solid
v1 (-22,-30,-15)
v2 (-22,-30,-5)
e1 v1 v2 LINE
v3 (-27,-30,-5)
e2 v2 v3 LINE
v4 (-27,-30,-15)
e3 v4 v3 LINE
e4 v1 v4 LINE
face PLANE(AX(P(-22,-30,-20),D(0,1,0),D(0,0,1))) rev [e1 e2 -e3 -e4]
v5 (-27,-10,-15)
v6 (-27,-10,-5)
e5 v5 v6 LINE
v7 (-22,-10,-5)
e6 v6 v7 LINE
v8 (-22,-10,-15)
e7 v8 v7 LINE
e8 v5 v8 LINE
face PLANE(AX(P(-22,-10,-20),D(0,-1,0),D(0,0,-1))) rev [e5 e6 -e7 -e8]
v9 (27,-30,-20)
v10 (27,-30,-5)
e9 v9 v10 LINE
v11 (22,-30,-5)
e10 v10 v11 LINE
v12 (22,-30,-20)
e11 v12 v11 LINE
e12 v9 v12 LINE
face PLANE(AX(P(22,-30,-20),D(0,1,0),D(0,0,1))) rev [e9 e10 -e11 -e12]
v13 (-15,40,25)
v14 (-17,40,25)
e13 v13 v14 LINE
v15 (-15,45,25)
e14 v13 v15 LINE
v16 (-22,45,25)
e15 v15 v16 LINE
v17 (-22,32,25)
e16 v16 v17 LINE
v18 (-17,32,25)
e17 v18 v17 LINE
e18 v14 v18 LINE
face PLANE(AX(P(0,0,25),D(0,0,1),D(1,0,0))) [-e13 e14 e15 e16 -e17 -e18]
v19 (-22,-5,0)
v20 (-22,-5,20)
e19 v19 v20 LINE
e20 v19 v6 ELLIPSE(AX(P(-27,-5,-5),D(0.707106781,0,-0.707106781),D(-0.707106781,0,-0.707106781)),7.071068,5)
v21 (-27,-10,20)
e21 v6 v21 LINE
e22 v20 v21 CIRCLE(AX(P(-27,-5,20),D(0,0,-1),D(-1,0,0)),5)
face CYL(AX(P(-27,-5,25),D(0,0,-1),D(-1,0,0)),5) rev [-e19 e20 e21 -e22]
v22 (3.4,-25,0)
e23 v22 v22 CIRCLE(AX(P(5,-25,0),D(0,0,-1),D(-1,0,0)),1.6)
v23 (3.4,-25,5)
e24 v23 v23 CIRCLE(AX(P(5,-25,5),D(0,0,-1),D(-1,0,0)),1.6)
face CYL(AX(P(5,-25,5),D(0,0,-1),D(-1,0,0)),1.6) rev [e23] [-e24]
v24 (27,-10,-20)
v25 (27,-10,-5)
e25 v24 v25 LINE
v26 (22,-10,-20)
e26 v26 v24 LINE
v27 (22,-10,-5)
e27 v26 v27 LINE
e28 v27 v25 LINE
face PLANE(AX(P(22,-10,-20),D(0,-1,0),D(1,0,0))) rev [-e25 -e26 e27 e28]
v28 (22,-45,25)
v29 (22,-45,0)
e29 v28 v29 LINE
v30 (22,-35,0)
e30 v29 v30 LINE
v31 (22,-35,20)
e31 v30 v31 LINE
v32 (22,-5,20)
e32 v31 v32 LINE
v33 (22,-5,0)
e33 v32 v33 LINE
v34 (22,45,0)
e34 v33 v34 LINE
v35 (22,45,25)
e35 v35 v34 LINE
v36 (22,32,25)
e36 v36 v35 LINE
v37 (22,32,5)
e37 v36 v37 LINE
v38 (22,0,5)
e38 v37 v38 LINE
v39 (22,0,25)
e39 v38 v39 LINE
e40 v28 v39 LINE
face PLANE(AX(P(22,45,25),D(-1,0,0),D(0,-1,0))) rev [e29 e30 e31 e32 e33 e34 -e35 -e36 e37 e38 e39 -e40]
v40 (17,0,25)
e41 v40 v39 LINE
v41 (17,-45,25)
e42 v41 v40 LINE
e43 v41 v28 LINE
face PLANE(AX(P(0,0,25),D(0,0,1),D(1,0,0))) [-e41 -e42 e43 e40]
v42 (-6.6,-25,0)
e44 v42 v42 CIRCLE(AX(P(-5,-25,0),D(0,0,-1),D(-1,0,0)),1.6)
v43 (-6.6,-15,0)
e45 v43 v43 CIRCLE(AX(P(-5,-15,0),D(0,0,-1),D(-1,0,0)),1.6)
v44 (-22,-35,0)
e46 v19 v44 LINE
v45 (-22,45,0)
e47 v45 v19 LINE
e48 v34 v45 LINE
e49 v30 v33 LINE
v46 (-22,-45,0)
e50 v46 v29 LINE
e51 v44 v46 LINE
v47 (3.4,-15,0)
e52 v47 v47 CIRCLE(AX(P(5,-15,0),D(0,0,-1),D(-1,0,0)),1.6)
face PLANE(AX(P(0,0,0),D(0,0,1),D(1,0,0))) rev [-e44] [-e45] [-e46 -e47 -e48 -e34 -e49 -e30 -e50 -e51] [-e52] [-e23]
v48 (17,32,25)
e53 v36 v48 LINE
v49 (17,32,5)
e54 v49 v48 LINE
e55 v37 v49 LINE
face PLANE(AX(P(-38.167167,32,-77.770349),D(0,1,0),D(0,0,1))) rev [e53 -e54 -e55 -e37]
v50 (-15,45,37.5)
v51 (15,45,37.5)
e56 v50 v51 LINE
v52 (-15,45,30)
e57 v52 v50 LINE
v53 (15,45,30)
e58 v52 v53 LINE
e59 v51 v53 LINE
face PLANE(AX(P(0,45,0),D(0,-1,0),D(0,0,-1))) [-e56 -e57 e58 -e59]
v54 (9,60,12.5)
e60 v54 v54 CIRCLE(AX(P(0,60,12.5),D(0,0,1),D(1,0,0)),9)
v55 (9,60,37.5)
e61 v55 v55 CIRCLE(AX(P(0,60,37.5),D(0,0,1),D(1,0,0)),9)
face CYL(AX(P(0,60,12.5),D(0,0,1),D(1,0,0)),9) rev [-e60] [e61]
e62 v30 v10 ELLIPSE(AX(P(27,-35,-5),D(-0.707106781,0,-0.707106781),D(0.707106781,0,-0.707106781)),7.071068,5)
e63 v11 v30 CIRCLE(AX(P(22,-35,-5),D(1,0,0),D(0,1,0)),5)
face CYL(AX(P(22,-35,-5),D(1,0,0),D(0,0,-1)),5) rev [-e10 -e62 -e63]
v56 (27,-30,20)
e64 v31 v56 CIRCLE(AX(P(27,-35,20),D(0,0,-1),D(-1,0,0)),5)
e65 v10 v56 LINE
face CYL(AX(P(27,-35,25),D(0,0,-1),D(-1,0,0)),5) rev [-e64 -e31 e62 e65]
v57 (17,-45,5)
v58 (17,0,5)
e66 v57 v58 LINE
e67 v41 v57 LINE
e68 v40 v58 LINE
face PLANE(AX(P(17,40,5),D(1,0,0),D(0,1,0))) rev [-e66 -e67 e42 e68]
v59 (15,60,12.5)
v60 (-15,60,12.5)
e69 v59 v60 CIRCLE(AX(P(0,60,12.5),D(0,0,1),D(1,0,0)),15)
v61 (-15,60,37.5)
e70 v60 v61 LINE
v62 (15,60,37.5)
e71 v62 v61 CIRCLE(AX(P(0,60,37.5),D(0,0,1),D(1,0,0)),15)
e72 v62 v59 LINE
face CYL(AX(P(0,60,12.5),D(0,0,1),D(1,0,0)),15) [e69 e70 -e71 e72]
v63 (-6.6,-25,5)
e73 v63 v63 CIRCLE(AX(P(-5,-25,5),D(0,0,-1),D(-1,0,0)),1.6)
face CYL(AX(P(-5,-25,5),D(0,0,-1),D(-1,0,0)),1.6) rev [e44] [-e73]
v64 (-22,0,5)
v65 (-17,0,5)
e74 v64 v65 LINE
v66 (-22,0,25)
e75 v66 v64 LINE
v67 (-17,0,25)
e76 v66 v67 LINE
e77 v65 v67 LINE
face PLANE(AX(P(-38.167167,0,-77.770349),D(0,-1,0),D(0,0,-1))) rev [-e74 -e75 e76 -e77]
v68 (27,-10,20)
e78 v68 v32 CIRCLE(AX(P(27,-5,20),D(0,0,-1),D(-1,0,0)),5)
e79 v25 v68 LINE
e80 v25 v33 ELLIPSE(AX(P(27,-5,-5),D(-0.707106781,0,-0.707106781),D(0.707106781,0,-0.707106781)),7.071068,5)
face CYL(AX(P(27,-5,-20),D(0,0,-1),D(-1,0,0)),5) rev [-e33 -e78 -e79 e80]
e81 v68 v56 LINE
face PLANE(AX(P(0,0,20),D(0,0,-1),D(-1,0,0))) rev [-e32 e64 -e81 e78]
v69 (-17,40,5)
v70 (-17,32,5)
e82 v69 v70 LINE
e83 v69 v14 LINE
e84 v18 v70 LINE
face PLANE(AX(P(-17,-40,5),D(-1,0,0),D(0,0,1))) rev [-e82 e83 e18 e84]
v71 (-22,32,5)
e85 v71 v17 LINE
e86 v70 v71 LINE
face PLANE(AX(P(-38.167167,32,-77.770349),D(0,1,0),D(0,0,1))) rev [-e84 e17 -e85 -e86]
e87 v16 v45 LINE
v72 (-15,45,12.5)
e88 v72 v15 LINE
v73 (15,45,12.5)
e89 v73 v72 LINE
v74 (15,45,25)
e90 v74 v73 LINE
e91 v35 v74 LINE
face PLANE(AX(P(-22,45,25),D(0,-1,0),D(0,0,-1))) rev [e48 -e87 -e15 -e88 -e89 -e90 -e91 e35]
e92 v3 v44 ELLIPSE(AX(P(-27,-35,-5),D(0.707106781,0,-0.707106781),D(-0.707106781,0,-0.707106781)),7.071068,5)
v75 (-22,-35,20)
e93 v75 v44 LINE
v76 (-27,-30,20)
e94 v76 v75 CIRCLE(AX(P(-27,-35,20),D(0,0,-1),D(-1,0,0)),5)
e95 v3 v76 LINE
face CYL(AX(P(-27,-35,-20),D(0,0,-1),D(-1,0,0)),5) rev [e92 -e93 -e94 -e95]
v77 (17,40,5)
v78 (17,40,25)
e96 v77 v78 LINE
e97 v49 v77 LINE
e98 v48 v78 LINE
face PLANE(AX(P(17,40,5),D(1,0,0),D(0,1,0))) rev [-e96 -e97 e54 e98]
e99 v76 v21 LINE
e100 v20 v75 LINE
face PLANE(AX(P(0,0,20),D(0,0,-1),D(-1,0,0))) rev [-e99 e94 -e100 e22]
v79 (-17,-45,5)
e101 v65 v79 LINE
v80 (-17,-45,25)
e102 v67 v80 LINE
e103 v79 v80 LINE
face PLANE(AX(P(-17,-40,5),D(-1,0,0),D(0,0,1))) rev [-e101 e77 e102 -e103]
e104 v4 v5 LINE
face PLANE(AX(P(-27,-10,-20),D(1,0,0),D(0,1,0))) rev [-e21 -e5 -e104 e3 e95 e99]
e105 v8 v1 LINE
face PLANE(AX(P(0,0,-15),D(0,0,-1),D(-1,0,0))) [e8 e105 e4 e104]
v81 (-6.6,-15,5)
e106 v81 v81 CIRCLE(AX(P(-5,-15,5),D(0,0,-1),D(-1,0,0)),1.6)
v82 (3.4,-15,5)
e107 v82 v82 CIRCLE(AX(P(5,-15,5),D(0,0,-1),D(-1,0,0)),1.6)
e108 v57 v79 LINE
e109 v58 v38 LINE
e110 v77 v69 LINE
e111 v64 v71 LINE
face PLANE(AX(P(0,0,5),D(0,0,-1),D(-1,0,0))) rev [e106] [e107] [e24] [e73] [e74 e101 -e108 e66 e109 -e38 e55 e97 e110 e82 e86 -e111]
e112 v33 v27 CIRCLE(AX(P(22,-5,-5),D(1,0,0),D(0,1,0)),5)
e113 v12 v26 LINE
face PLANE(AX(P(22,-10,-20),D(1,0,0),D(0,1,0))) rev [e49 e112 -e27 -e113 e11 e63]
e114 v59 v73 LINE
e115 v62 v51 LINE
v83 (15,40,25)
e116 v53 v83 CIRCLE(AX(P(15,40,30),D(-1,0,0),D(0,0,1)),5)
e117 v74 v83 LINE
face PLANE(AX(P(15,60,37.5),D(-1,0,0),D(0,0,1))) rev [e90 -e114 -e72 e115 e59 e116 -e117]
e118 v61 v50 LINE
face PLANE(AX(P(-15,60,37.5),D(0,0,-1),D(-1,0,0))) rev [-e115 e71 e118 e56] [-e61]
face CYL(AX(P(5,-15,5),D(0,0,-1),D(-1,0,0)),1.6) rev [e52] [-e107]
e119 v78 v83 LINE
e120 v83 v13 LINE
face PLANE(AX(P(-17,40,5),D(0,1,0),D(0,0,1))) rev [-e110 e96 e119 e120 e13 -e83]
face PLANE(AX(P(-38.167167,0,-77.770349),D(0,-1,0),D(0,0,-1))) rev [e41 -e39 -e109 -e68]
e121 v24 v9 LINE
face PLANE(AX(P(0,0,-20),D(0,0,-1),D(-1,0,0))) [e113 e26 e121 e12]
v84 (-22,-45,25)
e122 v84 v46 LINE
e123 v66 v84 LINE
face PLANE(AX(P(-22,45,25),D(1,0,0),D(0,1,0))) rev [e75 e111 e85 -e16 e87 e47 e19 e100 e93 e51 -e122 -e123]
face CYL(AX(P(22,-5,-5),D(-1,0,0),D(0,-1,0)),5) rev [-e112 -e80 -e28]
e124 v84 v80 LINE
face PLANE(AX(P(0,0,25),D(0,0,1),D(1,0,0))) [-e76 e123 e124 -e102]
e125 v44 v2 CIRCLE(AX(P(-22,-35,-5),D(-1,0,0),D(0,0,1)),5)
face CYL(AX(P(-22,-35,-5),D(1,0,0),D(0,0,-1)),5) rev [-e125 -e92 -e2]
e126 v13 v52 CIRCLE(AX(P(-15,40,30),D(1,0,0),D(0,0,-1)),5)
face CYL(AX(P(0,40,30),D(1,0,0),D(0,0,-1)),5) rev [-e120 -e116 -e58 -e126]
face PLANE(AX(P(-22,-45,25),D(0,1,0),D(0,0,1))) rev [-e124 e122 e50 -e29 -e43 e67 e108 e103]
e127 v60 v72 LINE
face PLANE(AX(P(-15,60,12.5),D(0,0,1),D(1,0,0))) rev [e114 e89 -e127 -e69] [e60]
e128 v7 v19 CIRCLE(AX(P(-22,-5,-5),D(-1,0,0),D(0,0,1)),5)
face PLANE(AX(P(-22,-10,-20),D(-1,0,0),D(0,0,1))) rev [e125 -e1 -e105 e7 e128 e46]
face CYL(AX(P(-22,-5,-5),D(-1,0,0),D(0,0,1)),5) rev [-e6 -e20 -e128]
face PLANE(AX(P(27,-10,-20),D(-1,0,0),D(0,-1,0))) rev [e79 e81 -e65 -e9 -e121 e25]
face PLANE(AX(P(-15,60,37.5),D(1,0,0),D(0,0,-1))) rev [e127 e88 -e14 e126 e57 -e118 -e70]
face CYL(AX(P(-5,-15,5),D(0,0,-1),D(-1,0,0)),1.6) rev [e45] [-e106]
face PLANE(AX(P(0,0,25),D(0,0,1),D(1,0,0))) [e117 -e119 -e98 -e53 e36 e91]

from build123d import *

# Parameters (mm, degrees)
SKETCH_1_W          = 44
SKETCH_1_H          = 90
EXTRUDE_1_DEPTH     = 25
CUT_EXTRUDE_1_DEPTH = 20
SKETCH_3_W          = 5
SKETCH_3_H          = 20
EXTRUDE_2_DEPTH     = 20
FILLET_1_R          = 5
FILLET_START        = -22.5281
FILLET_3_DEPTH      = 0.5281
FILLET_START_2      = 22
FILLET_3_2_DEPTH    = 0.5137
FILLET_START_3      = 22.5137
FILLET_3_3_DEPTH    = 4.4863
FILLET_START_4      = -27
FILLET_3_4_DEPTH    = 4.4719
FILLET_START_5      = -20
FILLET_3_5_DEPTH    = 20
SKETCH_4_W          = 30
SKETCH_4_H          = 25
EXTRUDE_3_DEPTH     = 15
SKETCH_5_R          = 15
EXTRUDE_4_DEPTH     = 25
SKETCH_6_R          = 9
CUT_EXTRUDE_2_DEPTH = 25
FILLET_4_R          = 5
SKETCH_7_W          = 76.334334434
SKETCH_7_H          = 32
CUT_EXTRUDE_3_DEPTH = 20
SKETCH_9_W          = 10
SKETCH_9_H          = 40
CUT_EXTRUDE_5_DEPTH = 5
SKETCH_10_R         = 1.6
CUT_EXTRUDE_6_DEPTH = 5


with BuildPart() as part:
    # 草图1 → 凸台-拉伸1 (new body)
    with BuildSketch(Plane.XY):
        Rectangle(SKETCH_1_W, SKETCH_1_H)
    extrude(amount=EXTRUDE_1_DEPTH)

    # 草图2 → 切除-拉伸1 (cut)
    with BuildSketch(Plane.XY.offset(25)):
        Polygon((-17, 40), (17, 40), (17, -40), (17, -54.466657213), (-17, -54.466657213), (-17, -40), align=None)
    extrude(amount=-CUT_EXTRUDE_1_DEPTH, mode=Mode.SUBTRACT)

    # 草图3 → 凸台-拉伸2 (add, symmetric)
    with BuildSketch(Plane(origin=(0, 0, 0), x_dir=(-1, 0, 0), z_dir=(0, 0, -1))):
        with Locations((24.5, -20)):
            Rectangle(SKETCH_3_W, SKETCH_3_H)
        with Locations((-24.5, -20)):
            Rectangle(SKETCH_3_W, SKETCH_3_H)
    extrude(amount=EXTRUDE_2_DEPTH, both=True)

    # 圆角1
    fillet_1_edges = [part.edges().sort_by_distance(p)[0] for p in [
        (22, -30, 10),
        (-22, -30, 10),
        (-22, -10, 10),
        (22, -10, 10),
    ]]
    fillet(fillet_1_edges, radius=FILLET_1_R - 0.0001)  # a hair under: the kernel refuses the full size

    # 圆角3: read off the stored shape, not the designer's step
    # 圆角3 outline → 圆角3 (add)
    with BuildSketch(Plane.YZ.offset(FILLET_START)):
        with BuildLine():
            Line((-5, 0), (-10, 0))
            Line((-10, 0), (-10, -5))
            ThreePointArc((-10, -5), (-8.535533906, -1.464466094), (-5, 0))
        make_face()
        with BuildLine():
            ThreePointArc((-35, 0), (-31.464466094, -1.464466094), (-30, -5))
            Line((-30, -5), (-30, 0))
            Line((-30, 0), (-35, 0))
        make_face()
    extrude(amount=FILLET_3_DEPTH)

    # Fillet 3 2 outline → Fillet 3 2 (add)
    with BuildSketch(Plane.YZ.offset(FILLET_START_2)):
        with BuildLine():
            Line((-5, 0), (-10, 0))
            Line((-10, 0), (-10, -5))
            ThreePointArc((-10, -5), (-8.535533906, -1.464466094), (-5, 0))
        make_face()
        with BuildLine():
            ThreePointArc((-35, 0), (-31.464466094, -1.464466094), (-30, -5))
            Line((-30, -5), (-30, 0))
            Line((-30, 0), (-35, 0))
        make_face()
    extrude(amount=FILLET_3_2_DEPTH)

    # Fillet 3 3 outline → Fillet 3 3 (add)
    with BuildSketch(Plane.YZ.offset(FILLET_START_3)):
        with BuildLine():
            ThreePointArc((-35, 0), (-31.464466094, -1.464466094), (-30, -5))
            Line((-30, -5), (-30, 0))
            Line((-30, 0), (-35, 0))
        make_face()
        with BuildLine():
            Line((-10, 0), (-10, -5))
            ThreePointArc((-10, -5), (-8.535533906, -1.464466094), (-5, 0))
            Line((-5, 0), (-10, 0))
        make_face()
    extrude(amount=FILLET_3_3_DEPTH)

    # Fillet 3 4 outline → Fillet 3 4 (add)
    with BuildSketch(Plane.YZ.offset(FILLET_START_4)):
        with BuildLine():
            ThreePointArc((-35, 0), (-31.464466094, -1.464466094), (-30, -5))
            Line((-30, -5), (-30, 0))
            Line((-30, 0), (-35, 0))
        make_face()
        with BuildLine():
            Line((-10, 0), (-10, -5))
            ThreePointArc((-10, -5), (-8.535533906, -1.464466094), (-5, 0))
            Line((-5, 0), (-10, 0))
        make_face()
    extrude(amount=FILLET_3_4_DEPTH)

    # Fillet 3 5 outline → Fillet 3 5 (cut)
    with BuildSketch(Plane.XY.offset(FILLET_START_5)):
        with BuildLine():
            ThreePointArc((27, -30), (23.464466094, -31.464466094), (22, -35))
            Line((22, -35), (22, -36))
            Line((22, -36), (27, -36))
            Line((27, -36), (27, -30))
        make_face()
        with BuildLine():
            ThreePointArc((22, -5), (23.464466094, -8.535533906), (27, -10))
            Line((27, -10), (27, -3))
            Line((27, -3), (22, -3))
            Line((22, -3), (22, -5))
        make_face()
        with BuildLine():
            Line((-27, -36), (-22, -36))
            Line((-22, -36), (-22, -35))
            ThreePointArc((-22, -35), (-23.464466094, -31.464466094), (-27, -30))
            Line((-27, -30), (-27, -36))
        make_face()
        with BuildLine():
            Line((-22, -5), (-22, -3))
            Line((-22, -3), (-27, -3))
            Line((-27, -3), (-27, -10))
            ThreePointArc((-27, -10), (-23.464466094, -8.535533906), (-22, -5))
        make_face()
    extrude(amount=FILLET_3_5_DEPTH, mode=Mode.SUBTRACT)

    # 草图4 → 凸台-拉伸3 (add)
    with BuildSketch(Plane(origin=(0, 45, 0), x_dir=(1, 0, 0), z_dir=(0, 1, 0))):
        with Locations((0, -25)):
            Rectangle(SKETCH_4_W, SKETCH_4_H)
    extrude(amount=EXTRUDE_3_DEPTH)

    # 草图5 → 凸台-拉伸4 (add)
    with BuildSketch(Plane.XY.offset(37.5)):
        with Locations((0, 60)):
            Circle(SKETCH_5_R)
    extrude(amount=-EXTRUDE_4_DEPTH)

    # 草图6 → 切除-拉伸2 (cut)
    with BuildSketch(Plane.XY.offset(37.5)):
        with Locations((0, 60)):
            Circle(SKETCH_6_R)
    extrude(amount=-CUT_EXTRUDE_2_DEPTH, mode=Mode.SUBTRACT)

    # 圆角4
    fillet_4_edges = [part.edges().sort_by_distance(p)[0] for p in [
        (0, 45, 25),
    ]]
    fillet(fillet_4_edges, radius=FILLET_4_R - 0.0001)  # a hair under: the kernel refuses the full size

    # 草图7 → 切除-拉伸3 (cut)
    with BuildSketch(Plane.XY.offset(25)):
        with Locations((0, 16)):
            Rectangle(SKETCH_7_W, SKETCH_7_H)
    extrude(amount=-CUT_EXTRUDE_3_DEPTH, mode=Mode.SUBTRACT)

    # 草图9 → 切除-拉伸5 (cut)
    with BuildSketch(Plane(origin=(0, 0, -20), x_dir=(-1, 0, 0), z_dir=(0, 0, -1))):
        with Locations((22, -10)):
            Rectangle(SKETCH_9_W, SKETCH_9_H)
    extrude(amount=-CUT_EXTRUDE_5_DEPTH, mode=Mode.SUBTRACT)

    # 草图10 → 切除-拉伸6 (cut)
    with BuildSketch(Plane(origin=(0, 0, 0), x_dir=(-1, 0, 0), z_dir=(0, 0, -1))):
        with Locations((5, -15)):
            Circle(SKETCH_10_R)
        with Locations((5, -25)):
            Circle(SKETCH_10_R)
        with Locations((-5, -25)):
            Circle(SKETCH_10_R)
        with Locations((-5, -15)):
            Circle(SKETCH_10_R)
    extrude(amount=-CUT_EXTRUDE_6_DEPTH, mode=Mode.SUBTRACT)


solid = part.part
